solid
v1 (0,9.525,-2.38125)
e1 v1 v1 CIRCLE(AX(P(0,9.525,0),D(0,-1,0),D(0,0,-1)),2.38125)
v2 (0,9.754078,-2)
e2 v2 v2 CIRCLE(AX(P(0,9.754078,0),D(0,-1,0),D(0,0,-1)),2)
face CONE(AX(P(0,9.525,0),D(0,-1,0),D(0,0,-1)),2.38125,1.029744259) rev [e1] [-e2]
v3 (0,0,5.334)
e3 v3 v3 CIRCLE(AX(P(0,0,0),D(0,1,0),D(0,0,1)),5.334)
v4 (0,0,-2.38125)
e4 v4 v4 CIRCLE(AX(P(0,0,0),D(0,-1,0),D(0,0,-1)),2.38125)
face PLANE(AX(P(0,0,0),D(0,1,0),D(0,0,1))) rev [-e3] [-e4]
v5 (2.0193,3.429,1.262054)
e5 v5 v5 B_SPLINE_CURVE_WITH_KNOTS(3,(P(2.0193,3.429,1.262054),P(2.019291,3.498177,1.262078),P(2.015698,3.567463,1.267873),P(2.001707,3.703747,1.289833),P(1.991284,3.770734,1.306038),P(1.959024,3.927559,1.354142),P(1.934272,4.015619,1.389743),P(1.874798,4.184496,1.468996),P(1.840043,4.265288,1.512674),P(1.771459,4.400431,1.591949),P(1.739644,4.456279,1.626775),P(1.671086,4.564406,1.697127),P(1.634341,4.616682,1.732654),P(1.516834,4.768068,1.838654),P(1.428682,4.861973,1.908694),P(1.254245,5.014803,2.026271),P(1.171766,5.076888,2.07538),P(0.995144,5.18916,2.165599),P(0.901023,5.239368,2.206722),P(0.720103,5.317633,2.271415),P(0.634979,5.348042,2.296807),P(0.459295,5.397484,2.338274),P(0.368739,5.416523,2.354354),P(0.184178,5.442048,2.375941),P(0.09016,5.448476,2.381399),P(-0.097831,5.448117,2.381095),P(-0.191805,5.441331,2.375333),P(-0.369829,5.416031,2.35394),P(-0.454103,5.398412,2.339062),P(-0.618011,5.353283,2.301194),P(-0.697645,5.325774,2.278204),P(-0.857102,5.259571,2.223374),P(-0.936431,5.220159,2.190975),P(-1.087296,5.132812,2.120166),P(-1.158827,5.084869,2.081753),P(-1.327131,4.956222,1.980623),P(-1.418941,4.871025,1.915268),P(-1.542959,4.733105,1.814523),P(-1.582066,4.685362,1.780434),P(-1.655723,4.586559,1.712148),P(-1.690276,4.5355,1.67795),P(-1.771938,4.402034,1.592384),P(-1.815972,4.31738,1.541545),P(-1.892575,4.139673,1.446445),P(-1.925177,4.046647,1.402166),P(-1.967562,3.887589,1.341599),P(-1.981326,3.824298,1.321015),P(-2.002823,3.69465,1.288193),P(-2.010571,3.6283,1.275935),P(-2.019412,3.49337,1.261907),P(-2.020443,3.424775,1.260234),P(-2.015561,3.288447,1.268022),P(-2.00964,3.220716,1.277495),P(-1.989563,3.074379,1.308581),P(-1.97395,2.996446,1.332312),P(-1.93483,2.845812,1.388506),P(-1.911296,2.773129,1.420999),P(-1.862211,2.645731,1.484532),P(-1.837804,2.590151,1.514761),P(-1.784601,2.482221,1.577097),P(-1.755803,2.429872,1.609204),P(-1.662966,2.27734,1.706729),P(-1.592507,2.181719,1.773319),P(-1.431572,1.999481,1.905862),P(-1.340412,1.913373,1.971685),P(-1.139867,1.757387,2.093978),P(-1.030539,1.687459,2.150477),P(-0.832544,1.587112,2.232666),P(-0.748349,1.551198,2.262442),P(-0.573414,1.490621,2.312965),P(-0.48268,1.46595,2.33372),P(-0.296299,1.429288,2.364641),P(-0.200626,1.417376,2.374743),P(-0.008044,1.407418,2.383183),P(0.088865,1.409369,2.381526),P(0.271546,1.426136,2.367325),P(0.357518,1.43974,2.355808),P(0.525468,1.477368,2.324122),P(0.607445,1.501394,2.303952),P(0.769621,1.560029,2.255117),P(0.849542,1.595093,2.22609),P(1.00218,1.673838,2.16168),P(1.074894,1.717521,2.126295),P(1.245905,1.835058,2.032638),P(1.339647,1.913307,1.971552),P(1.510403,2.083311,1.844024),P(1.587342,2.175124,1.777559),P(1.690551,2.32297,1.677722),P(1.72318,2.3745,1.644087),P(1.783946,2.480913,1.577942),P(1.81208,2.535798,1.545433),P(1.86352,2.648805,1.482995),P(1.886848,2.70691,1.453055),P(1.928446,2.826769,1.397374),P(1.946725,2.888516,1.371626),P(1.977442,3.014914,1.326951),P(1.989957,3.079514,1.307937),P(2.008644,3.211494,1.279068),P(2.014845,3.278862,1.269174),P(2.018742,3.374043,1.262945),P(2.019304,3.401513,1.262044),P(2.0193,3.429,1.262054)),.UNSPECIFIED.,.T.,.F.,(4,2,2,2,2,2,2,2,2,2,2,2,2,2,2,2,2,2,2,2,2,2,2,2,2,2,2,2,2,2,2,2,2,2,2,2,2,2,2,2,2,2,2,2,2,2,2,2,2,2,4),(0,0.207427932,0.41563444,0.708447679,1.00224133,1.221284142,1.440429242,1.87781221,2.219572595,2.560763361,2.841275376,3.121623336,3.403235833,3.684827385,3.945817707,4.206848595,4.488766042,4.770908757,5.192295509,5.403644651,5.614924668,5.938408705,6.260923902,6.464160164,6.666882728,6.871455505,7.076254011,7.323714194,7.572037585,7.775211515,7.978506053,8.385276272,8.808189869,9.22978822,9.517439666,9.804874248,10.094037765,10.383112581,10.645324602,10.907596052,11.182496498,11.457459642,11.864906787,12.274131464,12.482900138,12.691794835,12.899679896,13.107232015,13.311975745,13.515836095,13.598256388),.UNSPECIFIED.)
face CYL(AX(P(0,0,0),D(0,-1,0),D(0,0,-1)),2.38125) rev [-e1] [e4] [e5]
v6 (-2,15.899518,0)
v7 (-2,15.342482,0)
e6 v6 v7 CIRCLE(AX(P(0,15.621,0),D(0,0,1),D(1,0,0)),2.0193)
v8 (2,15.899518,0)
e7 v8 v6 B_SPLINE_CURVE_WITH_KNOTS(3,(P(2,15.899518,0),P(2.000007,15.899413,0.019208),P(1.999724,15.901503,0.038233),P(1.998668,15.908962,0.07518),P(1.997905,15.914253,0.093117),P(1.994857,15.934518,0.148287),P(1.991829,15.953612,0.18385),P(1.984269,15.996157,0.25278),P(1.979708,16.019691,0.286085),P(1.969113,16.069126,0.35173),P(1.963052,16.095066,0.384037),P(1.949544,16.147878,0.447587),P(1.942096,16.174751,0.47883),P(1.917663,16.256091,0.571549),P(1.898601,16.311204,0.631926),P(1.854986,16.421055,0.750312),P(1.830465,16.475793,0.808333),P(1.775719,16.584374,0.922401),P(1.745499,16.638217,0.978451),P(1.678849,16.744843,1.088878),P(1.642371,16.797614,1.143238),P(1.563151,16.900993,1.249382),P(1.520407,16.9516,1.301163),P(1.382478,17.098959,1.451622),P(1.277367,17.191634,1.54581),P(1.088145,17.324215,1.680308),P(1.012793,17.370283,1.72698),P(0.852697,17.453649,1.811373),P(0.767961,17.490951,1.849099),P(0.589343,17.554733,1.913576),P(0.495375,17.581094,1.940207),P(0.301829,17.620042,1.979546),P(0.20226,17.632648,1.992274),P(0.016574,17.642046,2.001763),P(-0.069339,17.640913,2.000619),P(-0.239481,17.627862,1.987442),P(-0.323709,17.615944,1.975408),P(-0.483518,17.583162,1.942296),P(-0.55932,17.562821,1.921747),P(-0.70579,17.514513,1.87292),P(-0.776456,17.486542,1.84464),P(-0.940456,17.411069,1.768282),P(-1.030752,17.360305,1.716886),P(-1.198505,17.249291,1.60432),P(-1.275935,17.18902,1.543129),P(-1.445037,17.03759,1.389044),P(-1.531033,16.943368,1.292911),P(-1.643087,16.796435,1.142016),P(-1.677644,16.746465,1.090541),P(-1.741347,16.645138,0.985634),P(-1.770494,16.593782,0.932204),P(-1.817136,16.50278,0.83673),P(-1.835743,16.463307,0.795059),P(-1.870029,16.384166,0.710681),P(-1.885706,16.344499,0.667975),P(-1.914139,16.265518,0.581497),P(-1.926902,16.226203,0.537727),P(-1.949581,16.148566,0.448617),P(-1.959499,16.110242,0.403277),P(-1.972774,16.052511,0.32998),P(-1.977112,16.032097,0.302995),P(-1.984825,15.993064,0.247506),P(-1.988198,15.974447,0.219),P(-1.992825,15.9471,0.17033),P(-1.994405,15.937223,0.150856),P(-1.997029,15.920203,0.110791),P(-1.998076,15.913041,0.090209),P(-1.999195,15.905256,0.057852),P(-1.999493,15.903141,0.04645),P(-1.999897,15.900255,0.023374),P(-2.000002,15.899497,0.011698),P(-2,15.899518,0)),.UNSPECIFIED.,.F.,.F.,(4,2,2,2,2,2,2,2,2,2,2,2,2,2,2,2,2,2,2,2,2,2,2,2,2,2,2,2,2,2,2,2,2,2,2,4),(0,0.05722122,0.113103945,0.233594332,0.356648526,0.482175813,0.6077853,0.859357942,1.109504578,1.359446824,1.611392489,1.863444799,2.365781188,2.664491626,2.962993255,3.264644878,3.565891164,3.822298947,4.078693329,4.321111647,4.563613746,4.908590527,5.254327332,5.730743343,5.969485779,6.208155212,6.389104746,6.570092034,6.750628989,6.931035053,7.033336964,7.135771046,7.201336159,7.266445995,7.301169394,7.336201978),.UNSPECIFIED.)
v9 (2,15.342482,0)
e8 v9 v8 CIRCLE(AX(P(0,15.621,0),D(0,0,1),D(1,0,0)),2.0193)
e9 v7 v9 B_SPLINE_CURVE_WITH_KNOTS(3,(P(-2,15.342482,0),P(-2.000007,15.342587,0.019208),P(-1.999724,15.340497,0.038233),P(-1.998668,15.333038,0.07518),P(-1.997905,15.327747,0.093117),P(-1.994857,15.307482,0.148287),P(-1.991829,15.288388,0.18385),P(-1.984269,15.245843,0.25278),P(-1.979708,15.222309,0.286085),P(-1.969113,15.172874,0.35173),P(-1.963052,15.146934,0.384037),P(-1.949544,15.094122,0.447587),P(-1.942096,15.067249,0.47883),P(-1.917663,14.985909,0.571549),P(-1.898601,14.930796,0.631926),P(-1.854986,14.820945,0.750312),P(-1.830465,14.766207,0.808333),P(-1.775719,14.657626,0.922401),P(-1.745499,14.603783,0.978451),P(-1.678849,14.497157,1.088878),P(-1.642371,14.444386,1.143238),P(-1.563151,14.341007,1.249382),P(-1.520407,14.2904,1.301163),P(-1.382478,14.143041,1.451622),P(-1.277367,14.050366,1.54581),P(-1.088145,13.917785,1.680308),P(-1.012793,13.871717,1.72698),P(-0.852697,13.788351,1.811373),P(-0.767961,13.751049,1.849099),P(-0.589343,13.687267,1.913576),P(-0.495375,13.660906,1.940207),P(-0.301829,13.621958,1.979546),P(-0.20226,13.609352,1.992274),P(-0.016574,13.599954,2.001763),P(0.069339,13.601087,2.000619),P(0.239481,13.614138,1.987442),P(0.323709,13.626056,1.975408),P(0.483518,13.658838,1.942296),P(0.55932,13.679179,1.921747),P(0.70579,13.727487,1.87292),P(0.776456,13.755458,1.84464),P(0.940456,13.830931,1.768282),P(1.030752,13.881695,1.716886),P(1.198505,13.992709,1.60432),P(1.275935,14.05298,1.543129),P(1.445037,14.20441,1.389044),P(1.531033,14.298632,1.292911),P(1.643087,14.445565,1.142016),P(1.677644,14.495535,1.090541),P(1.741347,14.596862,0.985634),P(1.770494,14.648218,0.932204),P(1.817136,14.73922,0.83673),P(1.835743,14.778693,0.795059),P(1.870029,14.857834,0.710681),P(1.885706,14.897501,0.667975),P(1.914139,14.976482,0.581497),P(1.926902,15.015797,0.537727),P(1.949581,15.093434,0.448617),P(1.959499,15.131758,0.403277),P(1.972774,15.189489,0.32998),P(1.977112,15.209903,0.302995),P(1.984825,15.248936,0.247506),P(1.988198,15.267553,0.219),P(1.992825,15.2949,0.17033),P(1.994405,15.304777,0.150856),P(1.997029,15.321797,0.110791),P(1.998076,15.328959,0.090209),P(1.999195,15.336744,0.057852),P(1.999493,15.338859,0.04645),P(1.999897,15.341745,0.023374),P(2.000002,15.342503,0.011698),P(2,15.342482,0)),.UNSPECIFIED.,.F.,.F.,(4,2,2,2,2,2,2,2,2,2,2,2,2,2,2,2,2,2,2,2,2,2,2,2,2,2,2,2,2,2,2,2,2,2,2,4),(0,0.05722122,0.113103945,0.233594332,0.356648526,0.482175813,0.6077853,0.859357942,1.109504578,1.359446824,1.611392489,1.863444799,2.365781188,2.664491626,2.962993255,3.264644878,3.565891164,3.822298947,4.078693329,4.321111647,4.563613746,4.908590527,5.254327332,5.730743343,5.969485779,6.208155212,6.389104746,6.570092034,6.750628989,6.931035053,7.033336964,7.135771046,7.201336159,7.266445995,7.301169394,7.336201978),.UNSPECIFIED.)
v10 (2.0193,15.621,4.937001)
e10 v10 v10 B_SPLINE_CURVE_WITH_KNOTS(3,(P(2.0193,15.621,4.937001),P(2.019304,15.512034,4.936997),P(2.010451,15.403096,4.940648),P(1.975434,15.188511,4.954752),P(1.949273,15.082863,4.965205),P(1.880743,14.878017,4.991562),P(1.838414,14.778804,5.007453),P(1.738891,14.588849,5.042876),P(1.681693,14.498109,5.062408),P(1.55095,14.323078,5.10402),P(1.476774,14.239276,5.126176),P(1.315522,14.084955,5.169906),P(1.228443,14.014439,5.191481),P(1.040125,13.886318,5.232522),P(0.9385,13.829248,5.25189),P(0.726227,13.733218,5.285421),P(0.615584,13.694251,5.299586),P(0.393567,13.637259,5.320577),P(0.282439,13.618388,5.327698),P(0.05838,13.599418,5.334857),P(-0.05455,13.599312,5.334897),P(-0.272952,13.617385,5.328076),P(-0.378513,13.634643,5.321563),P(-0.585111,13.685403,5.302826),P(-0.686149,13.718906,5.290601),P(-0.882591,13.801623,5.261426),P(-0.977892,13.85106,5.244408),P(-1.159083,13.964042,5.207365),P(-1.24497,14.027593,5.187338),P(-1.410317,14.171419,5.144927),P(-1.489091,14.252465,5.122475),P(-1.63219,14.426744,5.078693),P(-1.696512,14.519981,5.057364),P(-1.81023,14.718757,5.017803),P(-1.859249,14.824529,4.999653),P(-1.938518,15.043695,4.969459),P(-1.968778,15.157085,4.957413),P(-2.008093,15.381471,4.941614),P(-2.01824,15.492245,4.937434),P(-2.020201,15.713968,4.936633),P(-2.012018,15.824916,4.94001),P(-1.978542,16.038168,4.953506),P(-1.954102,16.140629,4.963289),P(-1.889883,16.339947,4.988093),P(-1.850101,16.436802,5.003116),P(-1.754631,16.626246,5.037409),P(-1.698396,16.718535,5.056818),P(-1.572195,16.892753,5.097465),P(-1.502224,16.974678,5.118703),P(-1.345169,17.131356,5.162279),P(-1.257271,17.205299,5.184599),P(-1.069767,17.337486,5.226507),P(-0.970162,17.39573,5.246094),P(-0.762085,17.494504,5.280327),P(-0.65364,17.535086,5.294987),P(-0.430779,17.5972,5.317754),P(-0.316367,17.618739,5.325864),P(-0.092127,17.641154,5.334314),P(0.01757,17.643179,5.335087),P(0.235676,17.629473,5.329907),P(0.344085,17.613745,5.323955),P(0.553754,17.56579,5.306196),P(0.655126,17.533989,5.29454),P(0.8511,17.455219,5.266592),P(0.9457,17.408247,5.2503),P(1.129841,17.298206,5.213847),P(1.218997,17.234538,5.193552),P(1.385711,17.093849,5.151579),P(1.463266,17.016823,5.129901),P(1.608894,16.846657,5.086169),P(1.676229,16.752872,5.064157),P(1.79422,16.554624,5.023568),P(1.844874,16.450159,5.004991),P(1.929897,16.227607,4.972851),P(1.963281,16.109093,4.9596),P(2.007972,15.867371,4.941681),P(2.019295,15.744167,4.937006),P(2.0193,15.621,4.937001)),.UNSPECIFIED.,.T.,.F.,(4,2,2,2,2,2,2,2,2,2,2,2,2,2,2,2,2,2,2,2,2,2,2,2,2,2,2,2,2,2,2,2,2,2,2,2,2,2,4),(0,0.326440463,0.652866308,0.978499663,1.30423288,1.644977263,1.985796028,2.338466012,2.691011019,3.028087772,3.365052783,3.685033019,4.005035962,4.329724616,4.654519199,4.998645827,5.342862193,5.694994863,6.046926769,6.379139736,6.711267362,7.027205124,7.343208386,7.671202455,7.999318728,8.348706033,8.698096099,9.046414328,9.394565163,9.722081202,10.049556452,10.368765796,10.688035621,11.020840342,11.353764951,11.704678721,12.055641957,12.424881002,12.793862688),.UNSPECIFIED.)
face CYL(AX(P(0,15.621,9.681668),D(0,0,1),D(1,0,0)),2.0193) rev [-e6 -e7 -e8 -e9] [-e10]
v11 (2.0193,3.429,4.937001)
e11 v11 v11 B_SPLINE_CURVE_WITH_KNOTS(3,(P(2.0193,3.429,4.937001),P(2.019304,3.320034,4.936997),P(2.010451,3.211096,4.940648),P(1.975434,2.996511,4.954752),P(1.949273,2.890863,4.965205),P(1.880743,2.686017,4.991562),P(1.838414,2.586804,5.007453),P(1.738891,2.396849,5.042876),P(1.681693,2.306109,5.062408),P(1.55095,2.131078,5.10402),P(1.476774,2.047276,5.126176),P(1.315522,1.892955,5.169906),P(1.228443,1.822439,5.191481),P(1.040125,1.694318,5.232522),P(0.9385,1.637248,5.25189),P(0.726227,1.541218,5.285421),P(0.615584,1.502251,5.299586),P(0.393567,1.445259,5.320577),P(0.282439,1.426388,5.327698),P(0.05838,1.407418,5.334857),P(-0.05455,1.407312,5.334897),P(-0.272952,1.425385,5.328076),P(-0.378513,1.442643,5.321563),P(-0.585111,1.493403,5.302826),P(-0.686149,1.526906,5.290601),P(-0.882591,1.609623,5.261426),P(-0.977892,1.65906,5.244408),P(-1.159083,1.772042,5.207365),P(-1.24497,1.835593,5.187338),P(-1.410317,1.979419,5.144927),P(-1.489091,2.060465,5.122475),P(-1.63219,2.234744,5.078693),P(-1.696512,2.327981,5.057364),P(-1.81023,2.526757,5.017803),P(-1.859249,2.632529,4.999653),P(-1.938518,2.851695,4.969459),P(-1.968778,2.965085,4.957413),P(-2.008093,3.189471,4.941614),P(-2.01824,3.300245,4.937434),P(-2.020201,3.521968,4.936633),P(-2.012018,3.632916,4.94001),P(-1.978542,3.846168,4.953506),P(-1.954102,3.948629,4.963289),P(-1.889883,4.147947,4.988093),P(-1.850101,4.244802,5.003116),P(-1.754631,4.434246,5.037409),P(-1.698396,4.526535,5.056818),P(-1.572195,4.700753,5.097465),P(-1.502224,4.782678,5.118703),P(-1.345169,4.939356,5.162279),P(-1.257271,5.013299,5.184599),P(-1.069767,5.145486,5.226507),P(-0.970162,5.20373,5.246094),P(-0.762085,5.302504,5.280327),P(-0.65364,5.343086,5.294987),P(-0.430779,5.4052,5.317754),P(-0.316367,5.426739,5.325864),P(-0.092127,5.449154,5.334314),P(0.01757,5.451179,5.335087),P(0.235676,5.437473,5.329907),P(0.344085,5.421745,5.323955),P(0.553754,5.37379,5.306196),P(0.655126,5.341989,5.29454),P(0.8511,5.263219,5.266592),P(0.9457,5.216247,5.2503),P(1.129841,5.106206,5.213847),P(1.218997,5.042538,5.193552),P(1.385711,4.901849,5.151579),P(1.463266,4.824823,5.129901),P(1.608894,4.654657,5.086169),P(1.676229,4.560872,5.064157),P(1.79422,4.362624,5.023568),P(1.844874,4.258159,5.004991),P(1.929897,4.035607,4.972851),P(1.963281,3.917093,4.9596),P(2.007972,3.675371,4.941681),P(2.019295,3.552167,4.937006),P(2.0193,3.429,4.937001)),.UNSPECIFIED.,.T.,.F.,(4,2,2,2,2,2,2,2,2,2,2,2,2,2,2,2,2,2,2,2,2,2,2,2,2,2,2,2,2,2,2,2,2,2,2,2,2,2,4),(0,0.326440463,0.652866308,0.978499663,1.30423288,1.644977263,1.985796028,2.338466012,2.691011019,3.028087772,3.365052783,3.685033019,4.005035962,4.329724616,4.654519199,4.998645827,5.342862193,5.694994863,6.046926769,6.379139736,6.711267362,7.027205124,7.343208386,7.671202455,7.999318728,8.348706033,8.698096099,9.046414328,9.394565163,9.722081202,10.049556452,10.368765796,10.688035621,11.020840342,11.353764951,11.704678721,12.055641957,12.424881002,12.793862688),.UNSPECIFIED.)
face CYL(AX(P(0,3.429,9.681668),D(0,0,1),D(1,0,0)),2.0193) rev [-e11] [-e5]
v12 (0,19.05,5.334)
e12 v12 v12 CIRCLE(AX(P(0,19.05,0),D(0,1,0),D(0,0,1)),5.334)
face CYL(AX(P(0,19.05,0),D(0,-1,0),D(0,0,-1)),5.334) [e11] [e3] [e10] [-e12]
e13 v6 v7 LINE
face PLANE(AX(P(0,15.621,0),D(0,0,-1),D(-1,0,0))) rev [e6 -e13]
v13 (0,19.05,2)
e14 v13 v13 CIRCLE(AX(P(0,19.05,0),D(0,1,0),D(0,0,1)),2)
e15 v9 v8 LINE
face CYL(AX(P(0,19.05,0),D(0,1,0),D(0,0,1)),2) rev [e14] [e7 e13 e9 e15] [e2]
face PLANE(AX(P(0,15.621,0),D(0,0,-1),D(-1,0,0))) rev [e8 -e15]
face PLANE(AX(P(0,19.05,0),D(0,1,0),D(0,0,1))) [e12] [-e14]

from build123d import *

# Parameters (mm, degrees)
SKETCH1_R                       = 5.334
BOSS_EXTRUDE1_DEPTH             = 19.05
F_4_0MM_DOWEL_HOLE2_D           = 4
F_4_0MM_DOWEL_HOLE2_DEPTH       = 9.525
F_4_0MM_DOWEL_HOLE2_TIP         = 1.201721238
F_3_16_0_1875_DOWEL_HOLE1_D     = 4.7625
F_3_16_0_1875_DOWEL_HOLE1_DEPTH = 9.525
F_3_16_0_1875_DOWEL_HOLE1_TIP   = 1.430799349
F_10_32_TAPPED_HOLE1_OUTLINE_R  = 2.0193
F_10_32_TAPPED_HOLE1_DEPTH      = 6


with BuildPart() as part:
    # Sketch1 → Boss-Extrude1 (new body)
    with BuildSketch(Plane(origin=(0, 0, 0), x_dir=(1, 0, 0), z_dir=(0, 1, 0))):
        with Locations(Location((0, 0, 0), (0, 0, 90))):
            Circle(SKETCH1_R)
    extrude(amount=BOSS_EXTRUDE1_DEPTH)

    # Ø4.0mm Dowel Hole2
    with Locations(Plane(origin=(0, 19.05, 0), x_dir=(1, 0, 0), z_dir=(0, 1, 0))):
        with Locations((0, 0)):
            Hole(F_4_0MM_DOWEL_HOLE2_D / 2, depth=F_4_0MM_DOWEL_HOLE2_DEPTH)
            with Locations((0, 0, -(F_4_0MM_DOWEL_HOLE2_DEPTH + F_4_0MM_DOWEL_HOLE2_TIP / 2))):  # 118° drill point
                Cone(0, F_4_0MM_DOWEL_HOLE2_D / 2, F_4_0MM_DOWEL_HOLE2_TIP, mode=Mode.SUBTRACT)

    # 3/16 (0.1875) Dowel Hole1
    with Locations(Plane(origin=(0, 0, 0), x_dir=(-1, 0, 0), z_dir=(0, -1, 0))):
        with Locations((0, 0)):
            Hole(F_3_16_0_1875_DOWEL_HOLE1_D / 2, depth=F_3_16_0_1875_DOWEL_HOLE1_DEPTH)
            with Locations((0, 0, -(F_3_16_0_1875_DOWEL_HOLE1_DEPTH + F_3_16_0_1875_DOWEL_HOLE1_TIP / 2))):  # 118° drill point
                Cone(0, F_3_16_0_1875_DOWEL_HOLE1_D / 2, F_3_16_0_1875_DOWEL_HOLE1_TIP, mode=Mode.SUBTRACT)

    # #10-32 Tapped Hole1: read off the stored shape, not the designer's step
    # #10-32 Tapped Hole1 outline → #10-32 Tapped Hole1 (cut)
    with BuildSketch(Plane.XY):
        with Locations((0, 3.429)):
            Circle(F_10_32_TAPPED_HOLE1_OUTLINE_R)
        with Locations((0, 15.621)):
            Circle(F_10_32_TAPPED_HOLE1_OUTLINE_R)
    extrude(amount=F_10_32_TAPPED_HOLE1_DEPTH, mode=Mode.SUBTRACT)


solid = part.part
